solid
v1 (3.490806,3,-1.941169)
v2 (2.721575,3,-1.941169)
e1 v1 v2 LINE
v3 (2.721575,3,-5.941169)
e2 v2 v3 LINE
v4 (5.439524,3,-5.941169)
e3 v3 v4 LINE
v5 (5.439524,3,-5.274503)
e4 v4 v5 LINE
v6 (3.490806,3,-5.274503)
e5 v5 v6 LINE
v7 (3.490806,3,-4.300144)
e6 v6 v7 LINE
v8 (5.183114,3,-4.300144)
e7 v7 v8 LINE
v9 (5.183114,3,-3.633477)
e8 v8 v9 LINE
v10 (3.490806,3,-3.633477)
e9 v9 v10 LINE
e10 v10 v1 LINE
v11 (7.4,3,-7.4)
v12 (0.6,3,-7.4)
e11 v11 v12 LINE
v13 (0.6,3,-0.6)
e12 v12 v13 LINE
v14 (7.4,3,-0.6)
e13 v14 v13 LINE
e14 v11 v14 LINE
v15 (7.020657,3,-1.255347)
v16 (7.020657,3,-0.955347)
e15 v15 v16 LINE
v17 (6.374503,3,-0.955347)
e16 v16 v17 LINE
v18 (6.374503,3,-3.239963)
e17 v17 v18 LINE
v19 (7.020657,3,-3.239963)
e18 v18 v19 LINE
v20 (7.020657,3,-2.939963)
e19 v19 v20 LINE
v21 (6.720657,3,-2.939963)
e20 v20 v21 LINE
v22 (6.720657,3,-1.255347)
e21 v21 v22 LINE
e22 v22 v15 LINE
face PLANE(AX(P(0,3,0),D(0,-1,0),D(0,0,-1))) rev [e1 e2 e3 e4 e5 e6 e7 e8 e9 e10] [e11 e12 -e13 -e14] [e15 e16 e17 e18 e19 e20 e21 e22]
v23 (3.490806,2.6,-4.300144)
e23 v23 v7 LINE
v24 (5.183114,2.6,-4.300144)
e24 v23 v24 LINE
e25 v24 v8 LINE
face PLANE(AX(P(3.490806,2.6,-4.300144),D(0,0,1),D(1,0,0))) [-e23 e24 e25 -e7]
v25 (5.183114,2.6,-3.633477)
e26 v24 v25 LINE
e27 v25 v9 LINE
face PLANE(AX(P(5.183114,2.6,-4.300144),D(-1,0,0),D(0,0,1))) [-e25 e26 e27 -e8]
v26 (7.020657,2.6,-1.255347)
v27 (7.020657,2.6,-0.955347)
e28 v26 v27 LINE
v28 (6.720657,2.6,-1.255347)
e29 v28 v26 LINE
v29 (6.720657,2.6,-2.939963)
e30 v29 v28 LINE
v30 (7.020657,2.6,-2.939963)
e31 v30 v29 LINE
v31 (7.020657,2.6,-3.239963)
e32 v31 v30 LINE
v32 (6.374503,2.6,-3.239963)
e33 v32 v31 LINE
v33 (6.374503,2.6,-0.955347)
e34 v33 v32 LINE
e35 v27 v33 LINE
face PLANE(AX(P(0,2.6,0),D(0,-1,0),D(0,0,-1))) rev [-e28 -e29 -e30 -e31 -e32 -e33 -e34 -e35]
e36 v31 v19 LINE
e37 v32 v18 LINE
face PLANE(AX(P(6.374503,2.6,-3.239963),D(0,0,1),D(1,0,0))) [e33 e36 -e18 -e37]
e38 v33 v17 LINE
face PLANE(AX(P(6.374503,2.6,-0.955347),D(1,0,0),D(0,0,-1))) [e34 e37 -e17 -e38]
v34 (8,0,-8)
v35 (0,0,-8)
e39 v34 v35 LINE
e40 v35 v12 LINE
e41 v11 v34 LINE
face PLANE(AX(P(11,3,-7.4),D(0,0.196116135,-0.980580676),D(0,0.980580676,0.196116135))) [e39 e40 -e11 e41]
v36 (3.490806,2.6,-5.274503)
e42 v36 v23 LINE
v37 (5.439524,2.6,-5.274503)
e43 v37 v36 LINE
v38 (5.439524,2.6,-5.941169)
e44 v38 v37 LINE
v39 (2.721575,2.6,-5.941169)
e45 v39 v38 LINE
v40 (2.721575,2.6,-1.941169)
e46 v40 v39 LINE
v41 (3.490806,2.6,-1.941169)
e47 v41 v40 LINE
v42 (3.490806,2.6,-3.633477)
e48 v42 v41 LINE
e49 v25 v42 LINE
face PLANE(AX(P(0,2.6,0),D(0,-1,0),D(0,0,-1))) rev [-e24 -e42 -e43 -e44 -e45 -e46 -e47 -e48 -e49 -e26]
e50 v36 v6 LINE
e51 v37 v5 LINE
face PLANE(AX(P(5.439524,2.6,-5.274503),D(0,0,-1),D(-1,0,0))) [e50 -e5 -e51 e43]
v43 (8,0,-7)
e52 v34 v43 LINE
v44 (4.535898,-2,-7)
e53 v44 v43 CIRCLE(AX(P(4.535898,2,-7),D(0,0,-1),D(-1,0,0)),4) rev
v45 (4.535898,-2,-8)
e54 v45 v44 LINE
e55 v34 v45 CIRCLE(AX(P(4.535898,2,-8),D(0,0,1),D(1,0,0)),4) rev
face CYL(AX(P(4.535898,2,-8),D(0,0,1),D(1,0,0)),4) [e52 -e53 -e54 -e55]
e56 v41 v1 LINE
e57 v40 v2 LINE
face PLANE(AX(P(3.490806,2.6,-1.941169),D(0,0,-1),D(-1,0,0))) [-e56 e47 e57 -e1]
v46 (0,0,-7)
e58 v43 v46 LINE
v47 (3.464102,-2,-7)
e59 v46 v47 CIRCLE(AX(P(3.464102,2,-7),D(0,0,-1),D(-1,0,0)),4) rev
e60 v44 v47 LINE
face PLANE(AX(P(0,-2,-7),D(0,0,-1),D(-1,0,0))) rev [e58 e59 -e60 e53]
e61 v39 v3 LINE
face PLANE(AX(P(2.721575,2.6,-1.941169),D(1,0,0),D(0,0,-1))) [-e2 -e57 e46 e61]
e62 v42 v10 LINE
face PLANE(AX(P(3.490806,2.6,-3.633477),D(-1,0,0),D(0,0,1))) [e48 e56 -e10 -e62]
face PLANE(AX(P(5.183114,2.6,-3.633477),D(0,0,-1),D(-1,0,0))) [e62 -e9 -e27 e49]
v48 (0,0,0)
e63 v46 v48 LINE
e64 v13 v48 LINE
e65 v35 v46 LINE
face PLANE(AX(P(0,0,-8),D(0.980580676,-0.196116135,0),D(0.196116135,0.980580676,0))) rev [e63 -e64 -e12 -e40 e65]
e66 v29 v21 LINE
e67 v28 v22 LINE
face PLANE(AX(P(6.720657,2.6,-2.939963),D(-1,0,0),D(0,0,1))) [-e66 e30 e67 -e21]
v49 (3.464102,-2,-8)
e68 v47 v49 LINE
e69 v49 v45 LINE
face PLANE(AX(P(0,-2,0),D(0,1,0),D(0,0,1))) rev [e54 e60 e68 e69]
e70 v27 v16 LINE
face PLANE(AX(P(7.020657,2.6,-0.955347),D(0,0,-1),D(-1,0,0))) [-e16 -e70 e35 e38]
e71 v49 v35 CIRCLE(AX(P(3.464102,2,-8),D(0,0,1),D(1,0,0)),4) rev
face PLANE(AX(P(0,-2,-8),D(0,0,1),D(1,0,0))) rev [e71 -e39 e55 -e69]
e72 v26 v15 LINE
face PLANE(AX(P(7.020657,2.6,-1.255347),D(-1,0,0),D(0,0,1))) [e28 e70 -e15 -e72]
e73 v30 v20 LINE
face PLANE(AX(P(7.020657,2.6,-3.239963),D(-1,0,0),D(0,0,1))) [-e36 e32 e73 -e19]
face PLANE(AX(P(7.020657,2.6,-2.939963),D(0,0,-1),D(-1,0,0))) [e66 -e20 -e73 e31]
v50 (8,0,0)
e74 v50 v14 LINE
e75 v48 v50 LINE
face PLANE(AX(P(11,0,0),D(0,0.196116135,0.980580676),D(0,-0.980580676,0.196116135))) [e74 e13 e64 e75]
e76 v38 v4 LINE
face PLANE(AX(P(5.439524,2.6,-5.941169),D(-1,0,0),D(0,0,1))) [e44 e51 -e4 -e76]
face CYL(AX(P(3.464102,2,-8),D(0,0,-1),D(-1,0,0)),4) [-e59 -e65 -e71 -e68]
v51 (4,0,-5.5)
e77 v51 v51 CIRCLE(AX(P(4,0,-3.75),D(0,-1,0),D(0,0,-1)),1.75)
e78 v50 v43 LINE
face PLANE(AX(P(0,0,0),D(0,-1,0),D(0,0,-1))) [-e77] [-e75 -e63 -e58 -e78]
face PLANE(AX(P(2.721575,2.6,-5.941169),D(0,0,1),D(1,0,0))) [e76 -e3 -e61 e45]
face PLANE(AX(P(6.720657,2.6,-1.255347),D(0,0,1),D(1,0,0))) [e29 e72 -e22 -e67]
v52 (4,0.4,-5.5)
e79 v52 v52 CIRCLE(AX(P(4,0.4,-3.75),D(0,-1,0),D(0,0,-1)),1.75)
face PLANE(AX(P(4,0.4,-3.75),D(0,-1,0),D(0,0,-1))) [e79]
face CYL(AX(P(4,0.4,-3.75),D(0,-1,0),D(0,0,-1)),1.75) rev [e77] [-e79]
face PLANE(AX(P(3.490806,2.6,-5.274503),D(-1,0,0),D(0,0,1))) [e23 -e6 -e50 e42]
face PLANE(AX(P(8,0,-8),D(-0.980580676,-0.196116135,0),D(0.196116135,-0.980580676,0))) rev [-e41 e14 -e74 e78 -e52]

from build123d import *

# Parameters (mm, degrees)
SKETCH1_W               = 8
SKETCH1_H               = 8
BOSS_EXTRUDE1_DEPTH     = 3
CUT_EXTRUDE1_DEPTH      = 12.704699911
CUT_EXTRUDE1_DEPTH_BACK = 12.704699911
CUT_EXTRUDE2_DEPTH      = 11
SKETCH4_R               = 1.75
CUT_EXTRUDE3_DEPTH      = 0.4
SKETCH5_W               = 8
SKETCH5_H               = 1
BOSS_EXTRUDE2_DEPTH     = 2
FILLET1_R               = 4
CUT_EXTRUDE4_DEPTH      = 0.4
CUT_EXTRUDE5_DEPTH      = 0.4


with BuildPart() as part:
    # Sketch1 → Boss-Extrude1 (new body)
    with BuildSketch(Plane(origin=(0, 0, 0), x_dir=(1, 0, 0), z_dir=(0, 1, 0))):
        with Locations((4, 4)):
            Rectangle(SKETCH1_W, SKETCH1_H)
    extrude(amount=BOSS_EXTRUDE1_DEPTH)

    # Sketch2 → Cut-Extrude1 (cut, two sides: drawn at the far end of the back side and taken through both)
    with BuildSketch(Plane.XY.offset(-CUT_EXTRUDE1_DEPTH_BACK)):
        Polygon((0, 0), (0.6, 3), (0, 3), align=None)
        Polygon((8, 0), (7.4, 3), (8, 3), align=None)
    extrude(amount=CUT_EXTRUDE1_DEPTH + CUT_EXTRUDE1_DEPTH_BACK, mode=Mode.SUBTRACT)

    # Sketch3 → Cut-Extrude2 (cut)
    with BuildSketch(Plane(origin=(0, 0, 0), x_dir=(0, 0, -1), z_dir=(1, 0, 0))):
        Polygon((0, 0), (0.6, 3), (0, 3), align=None)
        Polygon((8, 3), (7.4, 3), (8, 0), align=None)
    extrude(amount=CUT_EXTRUDE2_DEPTH, mode=Mode.SUBTRACT)

    # Sketch4 → Cut-Extrude3 (cut)
    with BuildSketch(Plane.XZ):
        with Locations(Location((4, -3.75, 0), (0, 0, 270))):
            Circle(SKETCH4_R)
    extrude(amount=-CUT_EXTRUDE3_DEPTH, mode=Mode.SUBTRACT)

    # Sketch5 → Boss-Extrude2 (add)
    with BuildSketch(Plane.XZ):
        with Locations((4, -7.5)):
            Rectangle(SKETCH5_W, SKETCH5_H)
    extrude(amount=BOSS_EXTRUDE2_DEPTH)

    # Fillet1
    # the kernel refuses this fillet: 4 mm, written as the material it takes off along each edge
    with BuildSketch(Plane(origin=(8, -2, -16.660254038), x_dir=(0, 1, 0), z_dir=(0, 0, 1)), Plane(origin=(0, -2, 1.660254038), x_dir=(0, 1, 0), z_dir=(0, 0, -1))) as fillet1_piece_1:
        with BuildLine():
            CenterArc((4, 3.464101615), FILLET1_R, 180, 60)
            Line((0, 3.464101615), (-0.08, 3.464101615))
            Line((-0.08, 3.464101615), (-0.08, 0))
            Line((-0.08, 0), (0, -0.08))
            ThreePointArc((0, -0.08), (1, -0.08), (1.96, -0.069282032))
            Line((1.96, -0.069282032), (2, 0))
        make_face()
    extrude(amount=18.320508076, mode=Mode.SUBTRACT)

    # Sketch6 → Cut-Extrude4 (cut)
    with BuildSketch(Plane(origin=(0, 3, 0), x_dir=(1, 0, 0), z_dir=(0, 1, 0))):
        Polygon((2.721575188, 1.941169366), (2.721575188, 5.941169366), (5.439523906, 5.941169366), (5.439523906, 5.2745027), (3.490805957, 5.2745027), (3.490805957, 4.300143725), (5.18311365, 4.300143725), (5.18311365, 3.633477059), (3.490805957, 3.633477059), (3.490805957, 1.941169366), align=None)
    extrude(amount=-CUT_EXTRUDE4_DEPTH, mode=Mode.SUBTRACT)

    # Sketch7 → Cut-Extrude5 (cut)
    with BuildSketch(Plane(origin=(0, 3, 0), x_dir=(1, 0, 0), z_dir=(0, 1, 0))):
        Polygon((6.374503362, 0.955347226), (6.374503362, 3.239962611), (7.020657208, 3.239962611), (7.020657208, 2.939962611), (6.720657208, 2.939962611), (6.720657208, 1.255347226), (7.020657208, 1.255347226), (7.020657208, 0.955347226), align=None)
    extrude(amount=-CUT_EXTRUDE5_DEPTH, mode=Mode.SUBTRACT)


solid = part.part
